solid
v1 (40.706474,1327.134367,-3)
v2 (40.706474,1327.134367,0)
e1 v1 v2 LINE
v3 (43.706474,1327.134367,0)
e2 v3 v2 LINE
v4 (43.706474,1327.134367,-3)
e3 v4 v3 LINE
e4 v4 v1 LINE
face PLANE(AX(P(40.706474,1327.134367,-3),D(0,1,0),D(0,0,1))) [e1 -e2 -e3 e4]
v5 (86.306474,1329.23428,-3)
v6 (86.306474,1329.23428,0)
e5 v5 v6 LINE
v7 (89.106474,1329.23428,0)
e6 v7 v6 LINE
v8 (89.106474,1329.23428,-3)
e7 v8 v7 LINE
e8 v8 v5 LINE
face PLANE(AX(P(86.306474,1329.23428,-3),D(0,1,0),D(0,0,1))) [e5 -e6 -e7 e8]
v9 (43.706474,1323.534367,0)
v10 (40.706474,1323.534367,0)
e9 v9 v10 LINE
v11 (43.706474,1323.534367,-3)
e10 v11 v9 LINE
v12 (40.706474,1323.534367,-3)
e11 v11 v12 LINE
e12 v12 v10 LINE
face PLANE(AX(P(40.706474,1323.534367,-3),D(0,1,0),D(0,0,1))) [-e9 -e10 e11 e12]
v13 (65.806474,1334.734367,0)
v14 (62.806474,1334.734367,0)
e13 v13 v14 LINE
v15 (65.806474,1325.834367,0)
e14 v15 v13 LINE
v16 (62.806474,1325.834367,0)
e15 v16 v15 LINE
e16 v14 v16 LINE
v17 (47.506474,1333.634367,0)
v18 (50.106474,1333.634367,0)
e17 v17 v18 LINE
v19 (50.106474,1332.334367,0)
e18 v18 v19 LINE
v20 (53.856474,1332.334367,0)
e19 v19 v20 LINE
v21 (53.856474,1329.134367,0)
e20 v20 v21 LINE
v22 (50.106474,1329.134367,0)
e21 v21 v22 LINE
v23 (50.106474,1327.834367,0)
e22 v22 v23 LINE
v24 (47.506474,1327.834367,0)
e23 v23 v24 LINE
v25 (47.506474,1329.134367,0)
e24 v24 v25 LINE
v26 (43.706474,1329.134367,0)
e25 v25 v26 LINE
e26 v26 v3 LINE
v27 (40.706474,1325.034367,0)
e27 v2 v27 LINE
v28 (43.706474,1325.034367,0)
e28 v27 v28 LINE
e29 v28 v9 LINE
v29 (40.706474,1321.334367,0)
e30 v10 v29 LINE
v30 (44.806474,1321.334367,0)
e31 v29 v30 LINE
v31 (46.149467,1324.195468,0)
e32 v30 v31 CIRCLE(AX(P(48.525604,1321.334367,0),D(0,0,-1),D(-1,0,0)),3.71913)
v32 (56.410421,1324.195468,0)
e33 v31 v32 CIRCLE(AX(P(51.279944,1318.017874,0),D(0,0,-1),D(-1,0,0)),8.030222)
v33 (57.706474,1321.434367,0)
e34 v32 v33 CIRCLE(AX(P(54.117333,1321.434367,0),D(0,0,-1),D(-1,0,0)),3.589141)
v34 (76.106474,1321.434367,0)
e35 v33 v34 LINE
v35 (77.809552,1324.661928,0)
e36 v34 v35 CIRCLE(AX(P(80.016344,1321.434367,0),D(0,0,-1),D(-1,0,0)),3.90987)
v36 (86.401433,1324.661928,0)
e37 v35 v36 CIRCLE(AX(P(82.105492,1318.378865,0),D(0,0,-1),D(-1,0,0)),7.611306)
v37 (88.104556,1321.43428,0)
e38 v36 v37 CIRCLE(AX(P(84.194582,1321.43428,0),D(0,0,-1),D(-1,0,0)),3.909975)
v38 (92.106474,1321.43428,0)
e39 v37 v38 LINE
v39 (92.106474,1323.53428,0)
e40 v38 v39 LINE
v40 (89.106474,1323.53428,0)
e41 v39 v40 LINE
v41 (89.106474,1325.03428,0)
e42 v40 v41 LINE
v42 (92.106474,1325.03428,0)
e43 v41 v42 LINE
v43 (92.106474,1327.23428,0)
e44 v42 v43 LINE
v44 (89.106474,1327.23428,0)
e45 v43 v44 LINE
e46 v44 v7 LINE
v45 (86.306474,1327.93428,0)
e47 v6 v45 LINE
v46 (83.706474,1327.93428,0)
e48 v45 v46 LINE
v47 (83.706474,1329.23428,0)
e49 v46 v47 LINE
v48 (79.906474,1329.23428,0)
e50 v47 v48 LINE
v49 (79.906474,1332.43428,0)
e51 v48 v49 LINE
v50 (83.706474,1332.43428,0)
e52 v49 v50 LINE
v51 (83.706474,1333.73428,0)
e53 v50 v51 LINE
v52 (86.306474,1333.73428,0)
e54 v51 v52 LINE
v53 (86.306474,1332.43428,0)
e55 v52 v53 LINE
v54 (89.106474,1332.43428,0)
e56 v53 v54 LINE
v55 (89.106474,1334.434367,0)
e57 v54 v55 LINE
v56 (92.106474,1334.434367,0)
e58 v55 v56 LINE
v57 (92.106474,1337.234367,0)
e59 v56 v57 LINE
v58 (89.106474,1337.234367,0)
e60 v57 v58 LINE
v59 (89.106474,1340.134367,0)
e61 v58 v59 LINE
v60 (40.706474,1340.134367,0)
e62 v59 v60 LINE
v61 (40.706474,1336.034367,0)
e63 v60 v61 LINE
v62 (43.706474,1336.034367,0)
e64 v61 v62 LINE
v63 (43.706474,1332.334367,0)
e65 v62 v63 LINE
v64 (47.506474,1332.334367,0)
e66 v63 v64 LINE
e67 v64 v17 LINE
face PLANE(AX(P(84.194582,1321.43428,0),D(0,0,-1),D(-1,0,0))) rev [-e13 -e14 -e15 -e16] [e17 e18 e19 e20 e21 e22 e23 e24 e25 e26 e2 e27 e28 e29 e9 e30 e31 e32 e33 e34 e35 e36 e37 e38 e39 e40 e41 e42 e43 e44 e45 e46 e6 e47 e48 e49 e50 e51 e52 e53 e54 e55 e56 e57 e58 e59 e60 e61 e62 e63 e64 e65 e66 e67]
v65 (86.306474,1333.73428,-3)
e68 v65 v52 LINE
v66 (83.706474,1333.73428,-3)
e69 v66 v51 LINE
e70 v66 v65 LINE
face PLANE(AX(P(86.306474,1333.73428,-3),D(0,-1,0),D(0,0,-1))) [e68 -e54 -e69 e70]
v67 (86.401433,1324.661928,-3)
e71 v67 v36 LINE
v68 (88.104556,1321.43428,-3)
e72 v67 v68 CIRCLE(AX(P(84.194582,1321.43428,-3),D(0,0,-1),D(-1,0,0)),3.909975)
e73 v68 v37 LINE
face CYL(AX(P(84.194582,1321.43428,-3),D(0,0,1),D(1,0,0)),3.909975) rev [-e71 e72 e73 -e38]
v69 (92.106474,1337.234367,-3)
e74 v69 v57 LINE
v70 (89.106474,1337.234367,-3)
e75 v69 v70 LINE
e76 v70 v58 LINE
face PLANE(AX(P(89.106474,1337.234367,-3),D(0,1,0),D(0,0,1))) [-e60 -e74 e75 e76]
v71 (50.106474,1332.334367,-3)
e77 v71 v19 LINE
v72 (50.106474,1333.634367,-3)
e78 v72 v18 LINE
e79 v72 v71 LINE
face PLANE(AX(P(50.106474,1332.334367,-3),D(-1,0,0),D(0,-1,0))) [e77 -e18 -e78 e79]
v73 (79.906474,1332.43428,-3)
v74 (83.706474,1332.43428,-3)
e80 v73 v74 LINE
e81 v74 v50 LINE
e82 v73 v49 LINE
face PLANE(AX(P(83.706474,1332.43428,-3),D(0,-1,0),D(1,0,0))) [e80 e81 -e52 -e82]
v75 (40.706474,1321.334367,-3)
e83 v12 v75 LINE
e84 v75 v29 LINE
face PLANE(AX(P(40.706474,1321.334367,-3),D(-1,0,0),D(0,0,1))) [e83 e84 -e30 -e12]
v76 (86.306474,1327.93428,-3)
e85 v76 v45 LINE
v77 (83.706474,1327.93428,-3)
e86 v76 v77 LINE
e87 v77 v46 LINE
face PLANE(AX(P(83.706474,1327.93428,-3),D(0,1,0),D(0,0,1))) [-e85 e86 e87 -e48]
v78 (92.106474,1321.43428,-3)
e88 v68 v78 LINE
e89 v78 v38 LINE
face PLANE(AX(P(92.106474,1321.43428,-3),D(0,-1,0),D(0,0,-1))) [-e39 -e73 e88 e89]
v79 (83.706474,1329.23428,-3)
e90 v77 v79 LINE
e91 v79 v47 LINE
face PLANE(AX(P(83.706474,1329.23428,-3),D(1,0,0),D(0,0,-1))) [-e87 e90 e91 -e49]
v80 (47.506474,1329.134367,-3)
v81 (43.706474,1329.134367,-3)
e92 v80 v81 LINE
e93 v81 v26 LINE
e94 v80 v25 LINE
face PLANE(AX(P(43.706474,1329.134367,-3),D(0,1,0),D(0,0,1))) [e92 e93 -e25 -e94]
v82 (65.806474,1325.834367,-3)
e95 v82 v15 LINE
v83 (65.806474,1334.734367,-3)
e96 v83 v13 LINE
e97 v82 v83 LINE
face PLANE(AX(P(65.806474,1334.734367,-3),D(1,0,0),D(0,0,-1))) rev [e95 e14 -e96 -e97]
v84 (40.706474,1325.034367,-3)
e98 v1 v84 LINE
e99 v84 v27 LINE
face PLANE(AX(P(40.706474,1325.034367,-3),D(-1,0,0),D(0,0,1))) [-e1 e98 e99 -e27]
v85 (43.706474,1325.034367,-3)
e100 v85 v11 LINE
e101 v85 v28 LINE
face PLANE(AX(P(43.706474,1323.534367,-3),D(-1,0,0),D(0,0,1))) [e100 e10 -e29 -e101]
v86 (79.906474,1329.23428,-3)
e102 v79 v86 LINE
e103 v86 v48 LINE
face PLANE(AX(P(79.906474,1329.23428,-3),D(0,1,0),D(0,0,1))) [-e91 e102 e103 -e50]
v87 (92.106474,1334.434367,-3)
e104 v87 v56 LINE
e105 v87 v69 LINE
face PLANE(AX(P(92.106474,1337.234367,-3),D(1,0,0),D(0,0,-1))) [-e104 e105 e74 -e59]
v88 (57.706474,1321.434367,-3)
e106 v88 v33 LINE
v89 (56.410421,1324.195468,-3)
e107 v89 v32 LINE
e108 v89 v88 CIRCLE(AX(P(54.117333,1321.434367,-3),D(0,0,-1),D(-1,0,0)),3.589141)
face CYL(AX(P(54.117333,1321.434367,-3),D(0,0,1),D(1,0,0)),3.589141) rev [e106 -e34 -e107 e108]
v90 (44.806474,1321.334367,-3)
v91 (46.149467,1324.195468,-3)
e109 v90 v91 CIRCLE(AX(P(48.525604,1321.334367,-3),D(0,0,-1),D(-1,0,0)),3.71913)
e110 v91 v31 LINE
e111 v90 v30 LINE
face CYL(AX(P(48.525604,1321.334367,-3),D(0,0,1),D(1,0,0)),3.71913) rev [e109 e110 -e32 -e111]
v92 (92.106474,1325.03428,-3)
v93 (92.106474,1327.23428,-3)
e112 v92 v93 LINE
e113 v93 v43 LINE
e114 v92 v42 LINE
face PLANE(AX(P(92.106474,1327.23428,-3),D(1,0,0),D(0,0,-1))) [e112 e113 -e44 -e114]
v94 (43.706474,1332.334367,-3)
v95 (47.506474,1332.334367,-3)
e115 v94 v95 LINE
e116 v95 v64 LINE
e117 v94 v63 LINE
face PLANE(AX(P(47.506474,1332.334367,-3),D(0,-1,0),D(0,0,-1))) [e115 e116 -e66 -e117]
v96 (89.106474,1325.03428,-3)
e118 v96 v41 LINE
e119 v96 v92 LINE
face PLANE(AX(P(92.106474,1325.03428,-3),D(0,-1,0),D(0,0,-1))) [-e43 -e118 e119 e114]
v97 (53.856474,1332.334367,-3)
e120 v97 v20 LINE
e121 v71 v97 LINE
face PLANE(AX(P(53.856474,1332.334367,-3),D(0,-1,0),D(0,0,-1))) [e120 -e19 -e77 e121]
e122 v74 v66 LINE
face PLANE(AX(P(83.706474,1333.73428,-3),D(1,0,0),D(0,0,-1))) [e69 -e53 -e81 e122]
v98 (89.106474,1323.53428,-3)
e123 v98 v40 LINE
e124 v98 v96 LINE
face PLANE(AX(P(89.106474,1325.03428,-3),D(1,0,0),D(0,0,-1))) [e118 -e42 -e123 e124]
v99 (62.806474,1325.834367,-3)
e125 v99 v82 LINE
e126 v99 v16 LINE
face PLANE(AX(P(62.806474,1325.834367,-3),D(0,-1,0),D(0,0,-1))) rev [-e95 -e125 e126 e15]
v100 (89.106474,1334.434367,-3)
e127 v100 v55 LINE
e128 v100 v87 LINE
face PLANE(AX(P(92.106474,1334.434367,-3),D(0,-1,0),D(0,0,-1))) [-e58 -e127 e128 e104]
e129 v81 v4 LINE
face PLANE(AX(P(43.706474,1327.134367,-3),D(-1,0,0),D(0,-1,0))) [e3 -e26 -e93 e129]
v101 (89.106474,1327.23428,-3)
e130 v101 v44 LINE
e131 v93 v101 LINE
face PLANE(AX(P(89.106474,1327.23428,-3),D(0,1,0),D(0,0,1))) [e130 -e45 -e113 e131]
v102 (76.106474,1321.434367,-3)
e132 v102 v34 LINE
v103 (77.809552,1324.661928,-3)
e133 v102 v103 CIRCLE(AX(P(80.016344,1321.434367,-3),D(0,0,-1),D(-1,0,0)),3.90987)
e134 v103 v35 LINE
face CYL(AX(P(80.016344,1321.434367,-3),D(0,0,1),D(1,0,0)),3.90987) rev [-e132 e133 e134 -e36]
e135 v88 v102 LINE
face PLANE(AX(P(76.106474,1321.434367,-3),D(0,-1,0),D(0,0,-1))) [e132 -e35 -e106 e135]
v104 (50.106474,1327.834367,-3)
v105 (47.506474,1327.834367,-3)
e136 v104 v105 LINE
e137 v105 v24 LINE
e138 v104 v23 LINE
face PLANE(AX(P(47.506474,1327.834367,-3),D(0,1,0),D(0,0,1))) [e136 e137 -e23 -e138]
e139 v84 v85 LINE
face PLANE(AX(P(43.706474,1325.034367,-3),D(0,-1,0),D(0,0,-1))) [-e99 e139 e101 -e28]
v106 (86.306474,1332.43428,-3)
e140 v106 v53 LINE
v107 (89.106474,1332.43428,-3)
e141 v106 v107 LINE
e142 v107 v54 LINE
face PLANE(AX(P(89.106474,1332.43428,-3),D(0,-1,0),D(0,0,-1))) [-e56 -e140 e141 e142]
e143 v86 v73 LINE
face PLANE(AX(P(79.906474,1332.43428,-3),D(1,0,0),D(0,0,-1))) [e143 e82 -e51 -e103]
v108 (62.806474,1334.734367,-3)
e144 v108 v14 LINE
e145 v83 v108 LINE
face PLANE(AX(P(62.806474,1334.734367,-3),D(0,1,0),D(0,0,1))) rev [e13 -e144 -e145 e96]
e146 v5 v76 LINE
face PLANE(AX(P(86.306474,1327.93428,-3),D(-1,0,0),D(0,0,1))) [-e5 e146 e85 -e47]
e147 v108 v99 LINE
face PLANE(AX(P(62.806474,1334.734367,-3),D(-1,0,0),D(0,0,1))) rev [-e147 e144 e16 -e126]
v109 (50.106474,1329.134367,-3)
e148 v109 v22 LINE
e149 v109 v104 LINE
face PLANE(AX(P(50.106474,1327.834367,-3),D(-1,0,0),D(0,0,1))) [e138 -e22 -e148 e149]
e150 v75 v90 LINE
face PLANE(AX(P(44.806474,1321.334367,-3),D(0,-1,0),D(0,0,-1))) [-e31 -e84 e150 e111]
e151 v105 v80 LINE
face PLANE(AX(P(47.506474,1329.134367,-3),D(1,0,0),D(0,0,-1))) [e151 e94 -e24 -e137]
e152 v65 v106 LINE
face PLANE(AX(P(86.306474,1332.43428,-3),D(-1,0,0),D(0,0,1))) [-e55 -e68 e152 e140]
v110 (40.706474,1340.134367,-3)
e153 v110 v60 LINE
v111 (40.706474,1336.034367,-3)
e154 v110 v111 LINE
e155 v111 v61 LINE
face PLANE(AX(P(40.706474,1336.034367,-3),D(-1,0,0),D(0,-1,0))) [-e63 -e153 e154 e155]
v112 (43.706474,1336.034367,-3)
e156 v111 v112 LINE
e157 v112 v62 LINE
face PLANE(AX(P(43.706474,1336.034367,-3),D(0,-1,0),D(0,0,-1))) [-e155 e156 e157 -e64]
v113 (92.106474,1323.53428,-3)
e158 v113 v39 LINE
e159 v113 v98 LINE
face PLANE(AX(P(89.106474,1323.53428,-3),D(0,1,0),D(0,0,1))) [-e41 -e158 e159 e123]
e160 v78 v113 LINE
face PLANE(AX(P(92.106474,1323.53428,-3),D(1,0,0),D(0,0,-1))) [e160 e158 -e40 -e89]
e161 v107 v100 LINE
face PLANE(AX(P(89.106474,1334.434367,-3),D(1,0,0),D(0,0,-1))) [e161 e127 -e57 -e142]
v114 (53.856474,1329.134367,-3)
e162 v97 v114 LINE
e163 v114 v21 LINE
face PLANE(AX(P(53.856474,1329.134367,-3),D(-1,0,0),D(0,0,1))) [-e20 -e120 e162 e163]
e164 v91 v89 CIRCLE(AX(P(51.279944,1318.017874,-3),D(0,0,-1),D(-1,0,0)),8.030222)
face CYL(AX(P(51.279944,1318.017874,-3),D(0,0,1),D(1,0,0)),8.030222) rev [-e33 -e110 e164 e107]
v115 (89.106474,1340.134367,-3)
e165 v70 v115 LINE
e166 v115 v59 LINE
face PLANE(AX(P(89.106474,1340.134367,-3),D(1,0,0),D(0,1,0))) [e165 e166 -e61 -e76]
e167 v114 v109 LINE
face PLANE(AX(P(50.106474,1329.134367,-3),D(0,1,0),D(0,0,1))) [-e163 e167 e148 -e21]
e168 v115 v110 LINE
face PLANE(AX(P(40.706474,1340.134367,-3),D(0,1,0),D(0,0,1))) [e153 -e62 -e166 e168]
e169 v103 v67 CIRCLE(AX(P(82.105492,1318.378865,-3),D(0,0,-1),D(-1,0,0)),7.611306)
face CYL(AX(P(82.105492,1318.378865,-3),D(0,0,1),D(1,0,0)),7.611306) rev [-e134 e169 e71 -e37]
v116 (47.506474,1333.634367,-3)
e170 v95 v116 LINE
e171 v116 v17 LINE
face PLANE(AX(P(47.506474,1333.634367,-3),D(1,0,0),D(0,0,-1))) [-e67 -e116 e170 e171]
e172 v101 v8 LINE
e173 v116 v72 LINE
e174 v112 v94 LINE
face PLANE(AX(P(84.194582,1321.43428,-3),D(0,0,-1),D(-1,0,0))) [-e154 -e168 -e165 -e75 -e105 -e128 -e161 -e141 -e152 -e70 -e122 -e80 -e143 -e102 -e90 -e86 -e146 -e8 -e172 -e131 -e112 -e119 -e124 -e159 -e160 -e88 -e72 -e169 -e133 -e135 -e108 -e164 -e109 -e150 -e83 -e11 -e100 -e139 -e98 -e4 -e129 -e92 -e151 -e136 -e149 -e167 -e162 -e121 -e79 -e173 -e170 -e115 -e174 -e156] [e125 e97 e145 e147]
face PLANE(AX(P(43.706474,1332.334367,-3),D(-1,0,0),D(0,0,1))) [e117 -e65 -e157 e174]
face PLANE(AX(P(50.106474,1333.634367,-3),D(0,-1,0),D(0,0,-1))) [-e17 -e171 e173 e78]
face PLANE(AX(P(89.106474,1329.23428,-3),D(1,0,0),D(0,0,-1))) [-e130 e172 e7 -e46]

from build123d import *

# Parameters (mm, degrees)
ESQUISSE1_W               = 3
ESQUISSE1_H               = 8.9
T_LE_DE_BASE_PLI_E1_DEPTH = 3


# Sheet-metal steps are written as plain solids
with BuildPart() as part:
    # Esquisse1 → Tôle de base pliée1 (new body)
    with BuildSketch(Plane.XY):
        with BuildLine():
            Line((40.706473987, 1340.134366737), (89.106473987, 1340.134366737))
            Line((89.106473987, 1340.134366737), (89.106473987, 1337.234366737))
            Line((89.106473987, 1337.234366737), (92.106473987, 1337.234366737))
            Line((92.106473987, 1337.234366737), (92.106473987, 1334.434366737))
            Line((92.106473987, 1334.434366737), (89.106473987, 1334.434366737))
            Line((89.106473987, 1334.434366737), (89.106473987, 1332.434279902))
            Line((89.106473987, 1332.434279902), (86.306473987, 1332.434279902))
            Line((86.306473987, 1332.434279902), (86.306473987, 1333.734279902))
            Line((86.306473987, 1333.734279902), (83.706473987, 1333.734279902))
            Line((83.706473987, 1333.734279902), (83.706473987, 1332.434279902))
            Line((83.706473987, 1332.434279902), (79.906473987, 1332.434279902))
            Line((79.906473987, 1332.434279902), (79.906473987, 1329.234279902))
            Line((79.906473987, 1329.234279902), (83.706473987, 1329.234279902))
            Line((83.706473987, 1329.234279902), (83.706473987, 1327.934279902))
            Line((83.706473987, 1327.934279902), (86.306473987, 1327.934279902))
            Line((86.306473987, 1327.934279902), (86.306473987, 1329.234279902))
            Line((86.306473987, 1329.234279902), (89.106473987, 1329.234279902))
            Line((89.106473987, 1329.234279902), (89.106473987, 1327.234279902))
            Line((89.106473987, 1327.234279902), (92.106473987, 1327.234279902))
            Line((92.106473987, 1327.234279902), (92.106473987, 1325.034279902))
            Line((92.106473987, 1325.034279902), (89.106473987, 1325.034279902))
            Line((89.106473987, 1325.034279902), (89.106473987, 1323.534279902))
            Line((89.106473987, 1323.534279902), (92.106473987, 1323.534279902))
            Line((92.106473987, 1323.534279902), (92.106473987, 1321.434279902))
            Line((92.106473987, 1321.434279902), (88.10455642, 1321.434279902))
            ThreePointArc((88.10455642, 1321.434279902), (87.652661624, 1323.258995148), (86.401432588, 1324.661927983))
            ThreePointArc((86.401432588, 1324.661927983), (82.105492294, 1325.990171363), (77.809552, 1324.661927983))
            ThreePointArc((77.809552, 1324.661927983), (76.558356626, 1323.259032892), (76.106473987, 1321.434366737))
            Line((76.106473987, 1321.434366737), (57.706473987, 1321.434366737))
            ThreePointArc((57.706473987, 1321.434366737), (57.366344351, 1322.959443215), (56.410421102, 1324.195467962))
            ThreePointArc((56.410421102, 1324.195467962), (51.279943841, 1326.048095935), (46.149466581, 1324.195467962))
            ThreePointArc((46.149466581, 1324.195467962), (45.158922245, 1322.914677571), (44.806473987, 1321.334366737))
            Line((44.806473987, 1321.334366737), (40.706473987, 1321.334366737))
            Line((40.706473987, 1321.334366737), (40.706473987, 1323.534366737))
            Line((40.706473987, 1323.534366737), (43.706473987, 1323.534366737))
            Line((43.706473987, 1323.534366737), (43.706473987, 1325.034366737))
            Line((43.706473987, 1325.034366737), (40.706473987, 1325.034366737))
            Line((40.706473987, 1325.034366737), (40.706473987, 1327.134366737))
            Line((40.706473987, 1327.134366737), (43.706473987, 1327.134366737))
            Line((43.706473987, 1327.134366737), (43.706473987, 1329.134366737))
            Line((43.706473987, 1329.134366737), (47.506473987, 1329.134366737))
            Line((47.506473987, 1329.134366737), (47.506473987, 1327.834366737))
            Line((47.506473987, 1327.834366737), (50.106473987, 1327.834366737))
            Line((50.106473987, 1327.834366737), (50.106473987, 1329.134366737))
            Line((50.106473987, 1329.134366737), (53.856473987, 1329.134366737))
            Line((53.856473987, 1329.134366737), (53.856473987, 1332.334366737))
            Line((53.856473987, 1332.334366737), (50.106473987, 1332.334366737))
            Line((50.106473987, 1332.334366737), (50.106473987, 1333.634366737))
            Line((50.106473987, 1333.634366737), (47.506473987, 1333.634366737))
            Line((47.506473987, 1333.634366737), (47.506473987, 1332.334366737))
            Line((47.506473987, 1332.334366737), (43.706473987, 1332.334366737))
            Line((43.706473987, 1332.334366737), (43.706473987, 1336.034366737))
            Line((43.706473987, 1336.034366737), (40.706473987, 1336.034366737))
            Line((40.706473987, 1336.034366737), (40.706473987, 1340.134366737))
        make_face()
        with Locations((64.306473987, 1330.284366737)):
            Rectangle(ESQUISSE1_W, ESQUISSE1_H, mode=Mode.SUBTRACT)
    extrude(amount=-T_LE_DE_BASE_PLI_E1_DEPTH)


solid = part.part
